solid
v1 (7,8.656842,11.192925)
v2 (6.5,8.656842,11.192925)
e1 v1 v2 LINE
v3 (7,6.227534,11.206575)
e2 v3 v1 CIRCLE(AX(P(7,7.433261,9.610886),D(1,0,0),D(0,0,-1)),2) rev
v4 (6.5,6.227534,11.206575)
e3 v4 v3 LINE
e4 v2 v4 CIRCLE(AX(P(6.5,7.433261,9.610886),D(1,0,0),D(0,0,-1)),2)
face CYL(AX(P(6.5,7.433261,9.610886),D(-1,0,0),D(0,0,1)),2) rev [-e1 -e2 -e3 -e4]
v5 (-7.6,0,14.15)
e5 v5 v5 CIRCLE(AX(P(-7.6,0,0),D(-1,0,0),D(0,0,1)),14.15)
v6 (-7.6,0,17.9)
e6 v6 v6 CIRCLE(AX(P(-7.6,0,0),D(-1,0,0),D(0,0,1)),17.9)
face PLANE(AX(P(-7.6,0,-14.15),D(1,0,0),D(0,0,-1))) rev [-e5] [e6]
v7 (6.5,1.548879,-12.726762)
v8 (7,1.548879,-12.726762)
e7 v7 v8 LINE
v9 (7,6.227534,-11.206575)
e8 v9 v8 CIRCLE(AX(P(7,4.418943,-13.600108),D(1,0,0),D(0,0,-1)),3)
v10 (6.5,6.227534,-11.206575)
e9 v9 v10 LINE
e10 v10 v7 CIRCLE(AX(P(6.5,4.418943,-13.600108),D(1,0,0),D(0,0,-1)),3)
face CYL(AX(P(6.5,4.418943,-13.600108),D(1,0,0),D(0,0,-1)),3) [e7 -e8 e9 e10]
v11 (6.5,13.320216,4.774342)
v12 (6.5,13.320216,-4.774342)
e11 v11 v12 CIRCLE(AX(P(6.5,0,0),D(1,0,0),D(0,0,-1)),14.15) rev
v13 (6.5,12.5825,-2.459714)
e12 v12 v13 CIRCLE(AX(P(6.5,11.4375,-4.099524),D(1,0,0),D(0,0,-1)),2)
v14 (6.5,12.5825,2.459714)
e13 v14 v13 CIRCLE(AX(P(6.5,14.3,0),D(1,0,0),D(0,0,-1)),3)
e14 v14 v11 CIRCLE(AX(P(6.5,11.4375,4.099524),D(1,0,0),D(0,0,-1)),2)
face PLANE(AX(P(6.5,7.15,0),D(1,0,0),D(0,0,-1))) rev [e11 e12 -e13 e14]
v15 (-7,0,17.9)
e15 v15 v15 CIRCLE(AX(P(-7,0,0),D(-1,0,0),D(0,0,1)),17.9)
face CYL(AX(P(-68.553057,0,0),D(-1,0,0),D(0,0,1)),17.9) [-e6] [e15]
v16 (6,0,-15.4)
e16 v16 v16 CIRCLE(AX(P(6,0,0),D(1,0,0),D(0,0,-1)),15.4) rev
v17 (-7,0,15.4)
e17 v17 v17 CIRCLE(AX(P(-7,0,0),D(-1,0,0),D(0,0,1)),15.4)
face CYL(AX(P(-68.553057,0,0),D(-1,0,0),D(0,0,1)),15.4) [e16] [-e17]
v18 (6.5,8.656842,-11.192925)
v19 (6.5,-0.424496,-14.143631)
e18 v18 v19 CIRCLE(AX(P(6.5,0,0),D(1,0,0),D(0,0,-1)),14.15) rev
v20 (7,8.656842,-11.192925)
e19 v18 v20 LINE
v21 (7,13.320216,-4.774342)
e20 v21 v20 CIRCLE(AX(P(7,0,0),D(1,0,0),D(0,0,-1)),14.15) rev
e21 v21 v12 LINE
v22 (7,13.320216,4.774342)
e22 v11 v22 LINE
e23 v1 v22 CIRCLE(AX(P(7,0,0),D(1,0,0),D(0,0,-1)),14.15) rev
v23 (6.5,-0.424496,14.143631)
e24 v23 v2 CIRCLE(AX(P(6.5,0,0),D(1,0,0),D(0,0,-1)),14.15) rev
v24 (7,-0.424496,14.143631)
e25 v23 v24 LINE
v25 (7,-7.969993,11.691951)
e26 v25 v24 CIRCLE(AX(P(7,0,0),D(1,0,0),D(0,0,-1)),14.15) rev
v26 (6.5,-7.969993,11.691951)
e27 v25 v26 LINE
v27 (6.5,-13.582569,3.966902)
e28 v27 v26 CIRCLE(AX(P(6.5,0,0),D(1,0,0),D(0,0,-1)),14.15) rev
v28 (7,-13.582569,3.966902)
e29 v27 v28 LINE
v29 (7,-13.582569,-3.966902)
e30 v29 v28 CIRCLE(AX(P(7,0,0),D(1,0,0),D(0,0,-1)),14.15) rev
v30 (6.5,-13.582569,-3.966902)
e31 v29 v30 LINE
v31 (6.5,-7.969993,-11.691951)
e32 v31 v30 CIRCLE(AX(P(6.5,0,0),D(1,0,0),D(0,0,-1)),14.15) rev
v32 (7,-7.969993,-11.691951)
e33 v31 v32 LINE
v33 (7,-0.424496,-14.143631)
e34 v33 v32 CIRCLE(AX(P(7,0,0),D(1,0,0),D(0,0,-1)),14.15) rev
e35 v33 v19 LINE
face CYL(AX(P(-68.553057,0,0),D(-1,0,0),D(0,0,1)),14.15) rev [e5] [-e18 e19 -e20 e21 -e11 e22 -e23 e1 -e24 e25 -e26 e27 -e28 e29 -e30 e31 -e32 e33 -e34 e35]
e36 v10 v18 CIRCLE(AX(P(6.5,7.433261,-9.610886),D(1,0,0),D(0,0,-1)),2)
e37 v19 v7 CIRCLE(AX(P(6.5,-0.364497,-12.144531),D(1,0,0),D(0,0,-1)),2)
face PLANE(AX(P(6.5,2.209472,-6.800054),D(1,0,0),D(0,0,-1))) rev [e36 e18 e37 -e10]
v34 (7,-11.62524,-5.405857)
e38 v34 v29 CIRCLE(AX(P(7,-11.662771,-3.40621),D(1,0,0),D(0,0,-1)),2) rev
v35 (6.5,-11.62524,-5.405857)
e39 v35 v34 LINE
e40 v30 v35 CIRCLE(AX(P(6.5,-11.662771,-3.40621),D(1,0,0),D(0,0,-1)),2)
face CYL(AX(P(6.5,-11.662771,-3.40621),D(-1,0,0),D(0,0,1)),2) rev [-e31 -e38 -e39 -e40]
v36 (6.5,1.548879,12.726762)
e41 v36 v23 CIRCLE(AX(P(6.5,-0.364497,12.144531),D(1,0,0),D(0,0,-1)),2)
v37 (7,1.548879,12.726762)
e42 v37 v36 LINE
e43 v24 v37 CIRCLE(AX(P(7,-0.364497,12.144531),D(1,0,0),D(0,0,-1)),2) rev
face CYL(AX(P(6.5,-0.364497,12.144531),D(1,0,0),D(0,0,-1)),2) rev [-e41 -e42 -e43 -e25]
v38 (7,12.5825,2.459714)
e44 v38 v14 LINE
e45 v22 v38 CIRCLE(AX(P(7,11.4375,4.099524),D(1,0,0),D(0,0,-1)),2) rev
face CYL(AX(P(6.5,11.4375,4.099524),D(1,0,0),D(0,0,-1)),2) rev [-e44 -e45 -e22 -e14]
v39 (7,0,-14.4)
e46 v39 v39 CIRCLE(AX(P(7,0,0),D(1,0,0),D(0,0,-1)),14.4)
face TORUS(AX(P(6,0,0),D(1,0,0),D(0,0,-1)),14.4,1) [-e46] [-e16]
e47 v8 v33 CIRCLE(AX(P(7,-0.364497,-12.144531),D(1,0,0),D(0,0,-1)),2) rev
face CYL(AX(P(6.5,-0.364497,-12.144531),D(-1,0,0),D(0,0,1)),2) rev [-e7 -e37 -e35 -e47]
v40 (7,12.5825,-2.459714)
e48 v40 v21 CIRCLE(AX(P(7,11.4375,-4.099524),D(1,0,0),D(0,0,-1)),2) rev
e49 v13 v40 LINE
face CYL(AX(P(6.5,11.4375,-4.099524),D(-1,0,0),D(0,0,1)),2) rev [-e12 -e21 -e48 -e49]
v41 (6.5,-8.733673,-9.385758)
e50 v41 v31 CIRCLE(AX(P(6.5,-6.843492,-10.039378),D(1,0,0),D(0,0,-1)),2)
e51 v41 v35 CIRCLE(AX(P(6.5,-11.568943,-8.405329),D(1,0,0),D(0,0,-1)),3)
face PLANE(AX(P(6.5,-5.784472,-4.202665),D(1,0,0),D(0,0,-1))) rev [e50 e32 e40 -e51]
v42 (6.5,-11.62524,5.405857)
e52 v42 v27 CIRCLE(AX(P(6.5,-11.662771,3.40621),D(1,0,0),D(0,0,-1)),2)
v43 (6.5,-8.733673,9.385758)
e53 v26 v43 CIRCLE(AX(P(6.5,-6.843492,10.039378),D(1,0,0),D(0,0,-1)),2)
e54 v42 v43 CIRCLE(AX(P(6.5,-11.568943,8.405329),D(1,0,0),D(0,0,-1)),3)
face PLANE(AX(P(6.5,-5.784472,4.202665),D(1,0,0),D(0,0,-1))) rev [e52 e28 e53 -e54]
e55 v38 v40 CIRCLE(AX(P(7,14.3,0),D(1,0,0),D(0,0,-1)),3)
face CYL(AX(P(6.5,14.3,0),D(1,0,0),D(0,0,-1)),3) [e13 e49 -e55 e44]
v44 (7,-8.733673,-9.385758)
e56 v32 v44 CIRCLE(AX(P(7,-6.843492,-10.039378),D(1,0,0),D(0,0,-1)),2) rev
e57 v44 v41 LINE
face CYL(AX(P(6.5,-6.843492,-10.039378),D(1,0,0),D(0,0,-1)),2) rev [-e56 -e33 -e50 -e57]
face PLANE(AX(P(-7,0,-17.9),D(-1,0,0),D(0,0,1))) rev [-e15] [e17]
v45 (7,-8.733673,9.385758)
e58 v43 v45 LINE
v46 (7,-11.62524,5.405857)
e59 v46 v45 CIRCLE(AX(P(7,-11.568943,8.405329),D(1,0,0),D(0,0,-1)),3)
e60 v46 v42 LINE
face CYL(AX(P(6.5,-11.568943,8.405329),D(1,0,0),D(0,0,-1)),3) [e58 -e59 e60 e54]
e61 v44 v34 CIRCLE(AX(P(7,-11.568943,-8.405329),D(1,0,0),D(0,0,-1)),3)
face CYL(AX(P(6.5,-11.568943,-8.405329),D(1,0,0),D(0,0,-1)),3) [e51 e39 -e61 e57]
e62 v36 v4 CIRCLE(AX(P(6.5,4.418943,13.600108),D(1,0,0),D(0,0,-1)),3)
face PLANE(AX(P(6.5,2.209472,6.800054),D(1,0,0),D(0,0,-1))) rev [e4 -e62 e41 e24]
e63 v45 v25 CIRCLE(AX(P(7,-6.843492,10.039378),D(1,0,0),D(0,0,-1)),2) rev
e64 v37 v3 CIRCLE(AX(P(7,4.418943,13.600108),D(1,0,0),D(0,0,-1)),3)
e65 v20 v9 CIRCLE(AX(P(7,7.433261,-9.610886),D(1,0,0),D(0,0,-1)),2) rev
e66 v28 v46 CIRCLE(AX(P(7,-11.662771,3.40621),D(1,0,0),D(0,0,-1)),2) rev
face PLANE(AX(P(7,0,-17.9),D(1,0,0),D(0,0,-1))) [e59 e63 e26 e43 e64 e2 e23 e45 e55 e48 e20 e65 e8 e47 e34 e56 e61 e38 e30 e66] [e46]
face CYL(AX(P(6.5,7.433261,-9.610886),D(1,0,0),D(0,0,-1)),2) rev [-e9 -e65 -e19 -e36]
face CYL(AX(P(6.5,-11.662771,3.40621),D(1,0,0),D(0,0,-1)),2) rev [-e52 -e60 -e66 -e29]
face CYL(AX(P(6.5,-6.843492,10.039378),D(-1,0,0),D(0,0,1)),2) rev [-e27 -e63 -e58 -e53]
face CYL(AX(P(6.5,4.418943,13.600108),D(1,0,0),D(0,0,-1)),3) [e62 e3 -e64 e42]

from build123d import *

# Parameters (mm, degrees)
SKETCH_3_R          = 19
CUT_EXTRUDE_1_DEPTH = 0.6
EXTRUDE_1_DEPTH     = 0.5
FILLET_1_R          = 2
FILLET_2_R          = 1


with BuildPart() as part:
    # 草图2 → 旋转1 (revolve)
    with BuildSketch(Plane(origin=(0, 0, 0), x_dir=(1, 0, 0), z_dir=(0, 1, 0)), mode=Mode.PRIVATE) as revolve_1_sk:
        Polygon((-7.6, 14.15), (-7.6, 17.9), (-7, 17.9), (-7, 15.4), (7, 15.4), (7, 17.9), (7.6, 17.9), (7.6, 14.15), align=None)
    revolve(revolve_1_sk.sketch.rotate(Axis((-68.553057404, 0, 0), (1, 0, 0)), 180), axis=Axis((-68.553057404, 0, 0), (1, 0, 0)))

    # 草图3 → 切除-拉伸1 (cut)
    with BuildSketch(Plane(origin=(7.6, 0, 0), x_dir=(0, 0, -1), z_dir=(1, 0, 0))):
        Circle(SKETCH_3_R)
    extrude(amount=-CUT_EXTRUDE_1_DEPTH, mode=Mode.SUBTRACT)

    # 草图4 → 凸台-拉伸1 (add)
    with BuildSketch(Plane(origin=(7, 0, 0), x_dir=(0, 0, -1), z_dir=(1, 0, 0))):
        with BuildLine():
            ThreePointArc((-12.378887951, 7.159129353), (-13.600108183, 4.41894302), (-14.222761377, 1.484270465))
            ThreePointArc((-14.222761377, 1.484270465), (-10.746938634, 3.491892036), (-12.378887951, 7.159129353))
        make_face()
        with BuildLine():
            ThreePointArc((-2.983449874, 13.985314685), (0, 11.3), (2.983449874, 13.985314685))
            ThreePointArc((2.983449874, 13.985314685), (0, 14.3), (-2.983449874, 13.985314685))
        make_face()
        with BuildLine():
            ThreePointArc((12.378887951, 7.159129353), (10.746938634, 3.491892036), (14.222761377, 1.484270465))
            ThreePointArc((14.222761377, 1.484270465), (13.600108183, 4.41894302), (12.378887951, 7.159129353))
        make_face()
        with BuildLine():
            ThreePointArc((10.634023371, -9.560729415), (6.641973351, -9.141892036), (5.80670007, -13.067985089))
            ThreePointArc((5.80670007, -13.067985089), (8.405329108, -11.56894302), (10.634023371, -9.560729415))
        make_face()
        with BuildLine():
            ThreePointArc((-5.80670007, -13.067985089), (-6.641973351, -9.141892036), (-10.634023371, -9.560729415))
            ThreePointArc((-10.634023371, -9.560729415), (-8.405329108, -11.56894302), (-5.80670007, -13.067985089))
        make_face()
    extrude(amount=-EXTRUDE_1_DEPTH)

    # 圆角1
    # the kernel refuses this fillet: 2 mm, written as the material it adds along each edge
    with BuildSketch(Plane(origin=(7, 13.836101399, -2.963916005), x_dir=(0, -0.2740436561087124, -0.9617172529109426), z_dir=(-1, 0, 0)), Plane(origin=(7, 1.456738837, -14.074814811), x_dir=(0, -0.9993316071526622, -0.03655597004153086), z_dir=(-1, 0, 0)), Plane(origin=(7, -12.935787284, -5.734797933), x_dir=(0, -0.3435772431436893, 0.9391244209335534), z_dir=(-1, 0, 0)), Plane(origin=(7, -9.45149505, 10.53051477), x_dir=(0, 0.7869891931288754, 0.6169667818435298), z_dir=(-1, 0, 0)), Plane(origin=(7, 7.094442099, 12.24301398), x_dir=(0, 0.8299633132761892, -0.5578179798246109), z_dir=(-1, 0, 0))) as fillet_1_piece_1:
        with BuildLine():
            CenterArc((1.749454913, 1.995570291), FILLET_1_R, 199.01971257, 74.794373043)
            ThreePointArc((-0.141358103, 1.34378341), (0.005960171, 0.6799537), (0, 0))
            ThreePointArc((0, 0), (0.941246655, -0.031340193), (1.88249331, 0))
        make_face()
    extrude(amount=0.5)
    with BuildSketch(Plane(origin=(7, 13.836101399, 2.963916005), x_dir=(0, -0.2740436561087127, 0.9617172529109423), z_dir=(-1, 0, 0)), Plane(origin=(7, 7.094442099, -12.24301398), x_dir=(0, 0.8299633132761899, 0.5578179798246101), z_dir=(-1, 0, 0)), Plane(origin=(7, -9.45149505, -10.53051477), x_dir=(0, 0.7869891931288755, -0.6169667818435297), z_dir=(-1, 0, 0)), Plane(origin=(7, -12.935787284, 5.734797933), x_dir=(0, -0.34357724314368965, -0.9391244209335534), z_dir=(-1, 0, 0)), Plane(origin=(7, 1.456738837, 14.074814811), x_dir=(0, -0.9993316071526621, 0.03655597004153149), z_dir=(-1, 0, 0))) as fillet_1_piece_2:
        with BuildLine():
            CenterArc((1.749454913, -1.995570291), FILLET_1_R, 86.185914387, 74.794373043)
            ThreePointArc((-0.141358103, -1.34378341), (0.005960171, -0.6799537), (0, 0))
            ThreePointArc((0, 0), (0.941246655, 0.031340193), (1.88249331, 0))
        make_face()
    extrude(amount=0.5)

    # 圆角2
    fillet_2_edges = [part.edges().sort_by_distance(p)[0] for p in [
        (7, 0, -15.4),
    ]]
    fillet(fillet_2_edges, radius=FILLET_2_R)


solid = part.part
